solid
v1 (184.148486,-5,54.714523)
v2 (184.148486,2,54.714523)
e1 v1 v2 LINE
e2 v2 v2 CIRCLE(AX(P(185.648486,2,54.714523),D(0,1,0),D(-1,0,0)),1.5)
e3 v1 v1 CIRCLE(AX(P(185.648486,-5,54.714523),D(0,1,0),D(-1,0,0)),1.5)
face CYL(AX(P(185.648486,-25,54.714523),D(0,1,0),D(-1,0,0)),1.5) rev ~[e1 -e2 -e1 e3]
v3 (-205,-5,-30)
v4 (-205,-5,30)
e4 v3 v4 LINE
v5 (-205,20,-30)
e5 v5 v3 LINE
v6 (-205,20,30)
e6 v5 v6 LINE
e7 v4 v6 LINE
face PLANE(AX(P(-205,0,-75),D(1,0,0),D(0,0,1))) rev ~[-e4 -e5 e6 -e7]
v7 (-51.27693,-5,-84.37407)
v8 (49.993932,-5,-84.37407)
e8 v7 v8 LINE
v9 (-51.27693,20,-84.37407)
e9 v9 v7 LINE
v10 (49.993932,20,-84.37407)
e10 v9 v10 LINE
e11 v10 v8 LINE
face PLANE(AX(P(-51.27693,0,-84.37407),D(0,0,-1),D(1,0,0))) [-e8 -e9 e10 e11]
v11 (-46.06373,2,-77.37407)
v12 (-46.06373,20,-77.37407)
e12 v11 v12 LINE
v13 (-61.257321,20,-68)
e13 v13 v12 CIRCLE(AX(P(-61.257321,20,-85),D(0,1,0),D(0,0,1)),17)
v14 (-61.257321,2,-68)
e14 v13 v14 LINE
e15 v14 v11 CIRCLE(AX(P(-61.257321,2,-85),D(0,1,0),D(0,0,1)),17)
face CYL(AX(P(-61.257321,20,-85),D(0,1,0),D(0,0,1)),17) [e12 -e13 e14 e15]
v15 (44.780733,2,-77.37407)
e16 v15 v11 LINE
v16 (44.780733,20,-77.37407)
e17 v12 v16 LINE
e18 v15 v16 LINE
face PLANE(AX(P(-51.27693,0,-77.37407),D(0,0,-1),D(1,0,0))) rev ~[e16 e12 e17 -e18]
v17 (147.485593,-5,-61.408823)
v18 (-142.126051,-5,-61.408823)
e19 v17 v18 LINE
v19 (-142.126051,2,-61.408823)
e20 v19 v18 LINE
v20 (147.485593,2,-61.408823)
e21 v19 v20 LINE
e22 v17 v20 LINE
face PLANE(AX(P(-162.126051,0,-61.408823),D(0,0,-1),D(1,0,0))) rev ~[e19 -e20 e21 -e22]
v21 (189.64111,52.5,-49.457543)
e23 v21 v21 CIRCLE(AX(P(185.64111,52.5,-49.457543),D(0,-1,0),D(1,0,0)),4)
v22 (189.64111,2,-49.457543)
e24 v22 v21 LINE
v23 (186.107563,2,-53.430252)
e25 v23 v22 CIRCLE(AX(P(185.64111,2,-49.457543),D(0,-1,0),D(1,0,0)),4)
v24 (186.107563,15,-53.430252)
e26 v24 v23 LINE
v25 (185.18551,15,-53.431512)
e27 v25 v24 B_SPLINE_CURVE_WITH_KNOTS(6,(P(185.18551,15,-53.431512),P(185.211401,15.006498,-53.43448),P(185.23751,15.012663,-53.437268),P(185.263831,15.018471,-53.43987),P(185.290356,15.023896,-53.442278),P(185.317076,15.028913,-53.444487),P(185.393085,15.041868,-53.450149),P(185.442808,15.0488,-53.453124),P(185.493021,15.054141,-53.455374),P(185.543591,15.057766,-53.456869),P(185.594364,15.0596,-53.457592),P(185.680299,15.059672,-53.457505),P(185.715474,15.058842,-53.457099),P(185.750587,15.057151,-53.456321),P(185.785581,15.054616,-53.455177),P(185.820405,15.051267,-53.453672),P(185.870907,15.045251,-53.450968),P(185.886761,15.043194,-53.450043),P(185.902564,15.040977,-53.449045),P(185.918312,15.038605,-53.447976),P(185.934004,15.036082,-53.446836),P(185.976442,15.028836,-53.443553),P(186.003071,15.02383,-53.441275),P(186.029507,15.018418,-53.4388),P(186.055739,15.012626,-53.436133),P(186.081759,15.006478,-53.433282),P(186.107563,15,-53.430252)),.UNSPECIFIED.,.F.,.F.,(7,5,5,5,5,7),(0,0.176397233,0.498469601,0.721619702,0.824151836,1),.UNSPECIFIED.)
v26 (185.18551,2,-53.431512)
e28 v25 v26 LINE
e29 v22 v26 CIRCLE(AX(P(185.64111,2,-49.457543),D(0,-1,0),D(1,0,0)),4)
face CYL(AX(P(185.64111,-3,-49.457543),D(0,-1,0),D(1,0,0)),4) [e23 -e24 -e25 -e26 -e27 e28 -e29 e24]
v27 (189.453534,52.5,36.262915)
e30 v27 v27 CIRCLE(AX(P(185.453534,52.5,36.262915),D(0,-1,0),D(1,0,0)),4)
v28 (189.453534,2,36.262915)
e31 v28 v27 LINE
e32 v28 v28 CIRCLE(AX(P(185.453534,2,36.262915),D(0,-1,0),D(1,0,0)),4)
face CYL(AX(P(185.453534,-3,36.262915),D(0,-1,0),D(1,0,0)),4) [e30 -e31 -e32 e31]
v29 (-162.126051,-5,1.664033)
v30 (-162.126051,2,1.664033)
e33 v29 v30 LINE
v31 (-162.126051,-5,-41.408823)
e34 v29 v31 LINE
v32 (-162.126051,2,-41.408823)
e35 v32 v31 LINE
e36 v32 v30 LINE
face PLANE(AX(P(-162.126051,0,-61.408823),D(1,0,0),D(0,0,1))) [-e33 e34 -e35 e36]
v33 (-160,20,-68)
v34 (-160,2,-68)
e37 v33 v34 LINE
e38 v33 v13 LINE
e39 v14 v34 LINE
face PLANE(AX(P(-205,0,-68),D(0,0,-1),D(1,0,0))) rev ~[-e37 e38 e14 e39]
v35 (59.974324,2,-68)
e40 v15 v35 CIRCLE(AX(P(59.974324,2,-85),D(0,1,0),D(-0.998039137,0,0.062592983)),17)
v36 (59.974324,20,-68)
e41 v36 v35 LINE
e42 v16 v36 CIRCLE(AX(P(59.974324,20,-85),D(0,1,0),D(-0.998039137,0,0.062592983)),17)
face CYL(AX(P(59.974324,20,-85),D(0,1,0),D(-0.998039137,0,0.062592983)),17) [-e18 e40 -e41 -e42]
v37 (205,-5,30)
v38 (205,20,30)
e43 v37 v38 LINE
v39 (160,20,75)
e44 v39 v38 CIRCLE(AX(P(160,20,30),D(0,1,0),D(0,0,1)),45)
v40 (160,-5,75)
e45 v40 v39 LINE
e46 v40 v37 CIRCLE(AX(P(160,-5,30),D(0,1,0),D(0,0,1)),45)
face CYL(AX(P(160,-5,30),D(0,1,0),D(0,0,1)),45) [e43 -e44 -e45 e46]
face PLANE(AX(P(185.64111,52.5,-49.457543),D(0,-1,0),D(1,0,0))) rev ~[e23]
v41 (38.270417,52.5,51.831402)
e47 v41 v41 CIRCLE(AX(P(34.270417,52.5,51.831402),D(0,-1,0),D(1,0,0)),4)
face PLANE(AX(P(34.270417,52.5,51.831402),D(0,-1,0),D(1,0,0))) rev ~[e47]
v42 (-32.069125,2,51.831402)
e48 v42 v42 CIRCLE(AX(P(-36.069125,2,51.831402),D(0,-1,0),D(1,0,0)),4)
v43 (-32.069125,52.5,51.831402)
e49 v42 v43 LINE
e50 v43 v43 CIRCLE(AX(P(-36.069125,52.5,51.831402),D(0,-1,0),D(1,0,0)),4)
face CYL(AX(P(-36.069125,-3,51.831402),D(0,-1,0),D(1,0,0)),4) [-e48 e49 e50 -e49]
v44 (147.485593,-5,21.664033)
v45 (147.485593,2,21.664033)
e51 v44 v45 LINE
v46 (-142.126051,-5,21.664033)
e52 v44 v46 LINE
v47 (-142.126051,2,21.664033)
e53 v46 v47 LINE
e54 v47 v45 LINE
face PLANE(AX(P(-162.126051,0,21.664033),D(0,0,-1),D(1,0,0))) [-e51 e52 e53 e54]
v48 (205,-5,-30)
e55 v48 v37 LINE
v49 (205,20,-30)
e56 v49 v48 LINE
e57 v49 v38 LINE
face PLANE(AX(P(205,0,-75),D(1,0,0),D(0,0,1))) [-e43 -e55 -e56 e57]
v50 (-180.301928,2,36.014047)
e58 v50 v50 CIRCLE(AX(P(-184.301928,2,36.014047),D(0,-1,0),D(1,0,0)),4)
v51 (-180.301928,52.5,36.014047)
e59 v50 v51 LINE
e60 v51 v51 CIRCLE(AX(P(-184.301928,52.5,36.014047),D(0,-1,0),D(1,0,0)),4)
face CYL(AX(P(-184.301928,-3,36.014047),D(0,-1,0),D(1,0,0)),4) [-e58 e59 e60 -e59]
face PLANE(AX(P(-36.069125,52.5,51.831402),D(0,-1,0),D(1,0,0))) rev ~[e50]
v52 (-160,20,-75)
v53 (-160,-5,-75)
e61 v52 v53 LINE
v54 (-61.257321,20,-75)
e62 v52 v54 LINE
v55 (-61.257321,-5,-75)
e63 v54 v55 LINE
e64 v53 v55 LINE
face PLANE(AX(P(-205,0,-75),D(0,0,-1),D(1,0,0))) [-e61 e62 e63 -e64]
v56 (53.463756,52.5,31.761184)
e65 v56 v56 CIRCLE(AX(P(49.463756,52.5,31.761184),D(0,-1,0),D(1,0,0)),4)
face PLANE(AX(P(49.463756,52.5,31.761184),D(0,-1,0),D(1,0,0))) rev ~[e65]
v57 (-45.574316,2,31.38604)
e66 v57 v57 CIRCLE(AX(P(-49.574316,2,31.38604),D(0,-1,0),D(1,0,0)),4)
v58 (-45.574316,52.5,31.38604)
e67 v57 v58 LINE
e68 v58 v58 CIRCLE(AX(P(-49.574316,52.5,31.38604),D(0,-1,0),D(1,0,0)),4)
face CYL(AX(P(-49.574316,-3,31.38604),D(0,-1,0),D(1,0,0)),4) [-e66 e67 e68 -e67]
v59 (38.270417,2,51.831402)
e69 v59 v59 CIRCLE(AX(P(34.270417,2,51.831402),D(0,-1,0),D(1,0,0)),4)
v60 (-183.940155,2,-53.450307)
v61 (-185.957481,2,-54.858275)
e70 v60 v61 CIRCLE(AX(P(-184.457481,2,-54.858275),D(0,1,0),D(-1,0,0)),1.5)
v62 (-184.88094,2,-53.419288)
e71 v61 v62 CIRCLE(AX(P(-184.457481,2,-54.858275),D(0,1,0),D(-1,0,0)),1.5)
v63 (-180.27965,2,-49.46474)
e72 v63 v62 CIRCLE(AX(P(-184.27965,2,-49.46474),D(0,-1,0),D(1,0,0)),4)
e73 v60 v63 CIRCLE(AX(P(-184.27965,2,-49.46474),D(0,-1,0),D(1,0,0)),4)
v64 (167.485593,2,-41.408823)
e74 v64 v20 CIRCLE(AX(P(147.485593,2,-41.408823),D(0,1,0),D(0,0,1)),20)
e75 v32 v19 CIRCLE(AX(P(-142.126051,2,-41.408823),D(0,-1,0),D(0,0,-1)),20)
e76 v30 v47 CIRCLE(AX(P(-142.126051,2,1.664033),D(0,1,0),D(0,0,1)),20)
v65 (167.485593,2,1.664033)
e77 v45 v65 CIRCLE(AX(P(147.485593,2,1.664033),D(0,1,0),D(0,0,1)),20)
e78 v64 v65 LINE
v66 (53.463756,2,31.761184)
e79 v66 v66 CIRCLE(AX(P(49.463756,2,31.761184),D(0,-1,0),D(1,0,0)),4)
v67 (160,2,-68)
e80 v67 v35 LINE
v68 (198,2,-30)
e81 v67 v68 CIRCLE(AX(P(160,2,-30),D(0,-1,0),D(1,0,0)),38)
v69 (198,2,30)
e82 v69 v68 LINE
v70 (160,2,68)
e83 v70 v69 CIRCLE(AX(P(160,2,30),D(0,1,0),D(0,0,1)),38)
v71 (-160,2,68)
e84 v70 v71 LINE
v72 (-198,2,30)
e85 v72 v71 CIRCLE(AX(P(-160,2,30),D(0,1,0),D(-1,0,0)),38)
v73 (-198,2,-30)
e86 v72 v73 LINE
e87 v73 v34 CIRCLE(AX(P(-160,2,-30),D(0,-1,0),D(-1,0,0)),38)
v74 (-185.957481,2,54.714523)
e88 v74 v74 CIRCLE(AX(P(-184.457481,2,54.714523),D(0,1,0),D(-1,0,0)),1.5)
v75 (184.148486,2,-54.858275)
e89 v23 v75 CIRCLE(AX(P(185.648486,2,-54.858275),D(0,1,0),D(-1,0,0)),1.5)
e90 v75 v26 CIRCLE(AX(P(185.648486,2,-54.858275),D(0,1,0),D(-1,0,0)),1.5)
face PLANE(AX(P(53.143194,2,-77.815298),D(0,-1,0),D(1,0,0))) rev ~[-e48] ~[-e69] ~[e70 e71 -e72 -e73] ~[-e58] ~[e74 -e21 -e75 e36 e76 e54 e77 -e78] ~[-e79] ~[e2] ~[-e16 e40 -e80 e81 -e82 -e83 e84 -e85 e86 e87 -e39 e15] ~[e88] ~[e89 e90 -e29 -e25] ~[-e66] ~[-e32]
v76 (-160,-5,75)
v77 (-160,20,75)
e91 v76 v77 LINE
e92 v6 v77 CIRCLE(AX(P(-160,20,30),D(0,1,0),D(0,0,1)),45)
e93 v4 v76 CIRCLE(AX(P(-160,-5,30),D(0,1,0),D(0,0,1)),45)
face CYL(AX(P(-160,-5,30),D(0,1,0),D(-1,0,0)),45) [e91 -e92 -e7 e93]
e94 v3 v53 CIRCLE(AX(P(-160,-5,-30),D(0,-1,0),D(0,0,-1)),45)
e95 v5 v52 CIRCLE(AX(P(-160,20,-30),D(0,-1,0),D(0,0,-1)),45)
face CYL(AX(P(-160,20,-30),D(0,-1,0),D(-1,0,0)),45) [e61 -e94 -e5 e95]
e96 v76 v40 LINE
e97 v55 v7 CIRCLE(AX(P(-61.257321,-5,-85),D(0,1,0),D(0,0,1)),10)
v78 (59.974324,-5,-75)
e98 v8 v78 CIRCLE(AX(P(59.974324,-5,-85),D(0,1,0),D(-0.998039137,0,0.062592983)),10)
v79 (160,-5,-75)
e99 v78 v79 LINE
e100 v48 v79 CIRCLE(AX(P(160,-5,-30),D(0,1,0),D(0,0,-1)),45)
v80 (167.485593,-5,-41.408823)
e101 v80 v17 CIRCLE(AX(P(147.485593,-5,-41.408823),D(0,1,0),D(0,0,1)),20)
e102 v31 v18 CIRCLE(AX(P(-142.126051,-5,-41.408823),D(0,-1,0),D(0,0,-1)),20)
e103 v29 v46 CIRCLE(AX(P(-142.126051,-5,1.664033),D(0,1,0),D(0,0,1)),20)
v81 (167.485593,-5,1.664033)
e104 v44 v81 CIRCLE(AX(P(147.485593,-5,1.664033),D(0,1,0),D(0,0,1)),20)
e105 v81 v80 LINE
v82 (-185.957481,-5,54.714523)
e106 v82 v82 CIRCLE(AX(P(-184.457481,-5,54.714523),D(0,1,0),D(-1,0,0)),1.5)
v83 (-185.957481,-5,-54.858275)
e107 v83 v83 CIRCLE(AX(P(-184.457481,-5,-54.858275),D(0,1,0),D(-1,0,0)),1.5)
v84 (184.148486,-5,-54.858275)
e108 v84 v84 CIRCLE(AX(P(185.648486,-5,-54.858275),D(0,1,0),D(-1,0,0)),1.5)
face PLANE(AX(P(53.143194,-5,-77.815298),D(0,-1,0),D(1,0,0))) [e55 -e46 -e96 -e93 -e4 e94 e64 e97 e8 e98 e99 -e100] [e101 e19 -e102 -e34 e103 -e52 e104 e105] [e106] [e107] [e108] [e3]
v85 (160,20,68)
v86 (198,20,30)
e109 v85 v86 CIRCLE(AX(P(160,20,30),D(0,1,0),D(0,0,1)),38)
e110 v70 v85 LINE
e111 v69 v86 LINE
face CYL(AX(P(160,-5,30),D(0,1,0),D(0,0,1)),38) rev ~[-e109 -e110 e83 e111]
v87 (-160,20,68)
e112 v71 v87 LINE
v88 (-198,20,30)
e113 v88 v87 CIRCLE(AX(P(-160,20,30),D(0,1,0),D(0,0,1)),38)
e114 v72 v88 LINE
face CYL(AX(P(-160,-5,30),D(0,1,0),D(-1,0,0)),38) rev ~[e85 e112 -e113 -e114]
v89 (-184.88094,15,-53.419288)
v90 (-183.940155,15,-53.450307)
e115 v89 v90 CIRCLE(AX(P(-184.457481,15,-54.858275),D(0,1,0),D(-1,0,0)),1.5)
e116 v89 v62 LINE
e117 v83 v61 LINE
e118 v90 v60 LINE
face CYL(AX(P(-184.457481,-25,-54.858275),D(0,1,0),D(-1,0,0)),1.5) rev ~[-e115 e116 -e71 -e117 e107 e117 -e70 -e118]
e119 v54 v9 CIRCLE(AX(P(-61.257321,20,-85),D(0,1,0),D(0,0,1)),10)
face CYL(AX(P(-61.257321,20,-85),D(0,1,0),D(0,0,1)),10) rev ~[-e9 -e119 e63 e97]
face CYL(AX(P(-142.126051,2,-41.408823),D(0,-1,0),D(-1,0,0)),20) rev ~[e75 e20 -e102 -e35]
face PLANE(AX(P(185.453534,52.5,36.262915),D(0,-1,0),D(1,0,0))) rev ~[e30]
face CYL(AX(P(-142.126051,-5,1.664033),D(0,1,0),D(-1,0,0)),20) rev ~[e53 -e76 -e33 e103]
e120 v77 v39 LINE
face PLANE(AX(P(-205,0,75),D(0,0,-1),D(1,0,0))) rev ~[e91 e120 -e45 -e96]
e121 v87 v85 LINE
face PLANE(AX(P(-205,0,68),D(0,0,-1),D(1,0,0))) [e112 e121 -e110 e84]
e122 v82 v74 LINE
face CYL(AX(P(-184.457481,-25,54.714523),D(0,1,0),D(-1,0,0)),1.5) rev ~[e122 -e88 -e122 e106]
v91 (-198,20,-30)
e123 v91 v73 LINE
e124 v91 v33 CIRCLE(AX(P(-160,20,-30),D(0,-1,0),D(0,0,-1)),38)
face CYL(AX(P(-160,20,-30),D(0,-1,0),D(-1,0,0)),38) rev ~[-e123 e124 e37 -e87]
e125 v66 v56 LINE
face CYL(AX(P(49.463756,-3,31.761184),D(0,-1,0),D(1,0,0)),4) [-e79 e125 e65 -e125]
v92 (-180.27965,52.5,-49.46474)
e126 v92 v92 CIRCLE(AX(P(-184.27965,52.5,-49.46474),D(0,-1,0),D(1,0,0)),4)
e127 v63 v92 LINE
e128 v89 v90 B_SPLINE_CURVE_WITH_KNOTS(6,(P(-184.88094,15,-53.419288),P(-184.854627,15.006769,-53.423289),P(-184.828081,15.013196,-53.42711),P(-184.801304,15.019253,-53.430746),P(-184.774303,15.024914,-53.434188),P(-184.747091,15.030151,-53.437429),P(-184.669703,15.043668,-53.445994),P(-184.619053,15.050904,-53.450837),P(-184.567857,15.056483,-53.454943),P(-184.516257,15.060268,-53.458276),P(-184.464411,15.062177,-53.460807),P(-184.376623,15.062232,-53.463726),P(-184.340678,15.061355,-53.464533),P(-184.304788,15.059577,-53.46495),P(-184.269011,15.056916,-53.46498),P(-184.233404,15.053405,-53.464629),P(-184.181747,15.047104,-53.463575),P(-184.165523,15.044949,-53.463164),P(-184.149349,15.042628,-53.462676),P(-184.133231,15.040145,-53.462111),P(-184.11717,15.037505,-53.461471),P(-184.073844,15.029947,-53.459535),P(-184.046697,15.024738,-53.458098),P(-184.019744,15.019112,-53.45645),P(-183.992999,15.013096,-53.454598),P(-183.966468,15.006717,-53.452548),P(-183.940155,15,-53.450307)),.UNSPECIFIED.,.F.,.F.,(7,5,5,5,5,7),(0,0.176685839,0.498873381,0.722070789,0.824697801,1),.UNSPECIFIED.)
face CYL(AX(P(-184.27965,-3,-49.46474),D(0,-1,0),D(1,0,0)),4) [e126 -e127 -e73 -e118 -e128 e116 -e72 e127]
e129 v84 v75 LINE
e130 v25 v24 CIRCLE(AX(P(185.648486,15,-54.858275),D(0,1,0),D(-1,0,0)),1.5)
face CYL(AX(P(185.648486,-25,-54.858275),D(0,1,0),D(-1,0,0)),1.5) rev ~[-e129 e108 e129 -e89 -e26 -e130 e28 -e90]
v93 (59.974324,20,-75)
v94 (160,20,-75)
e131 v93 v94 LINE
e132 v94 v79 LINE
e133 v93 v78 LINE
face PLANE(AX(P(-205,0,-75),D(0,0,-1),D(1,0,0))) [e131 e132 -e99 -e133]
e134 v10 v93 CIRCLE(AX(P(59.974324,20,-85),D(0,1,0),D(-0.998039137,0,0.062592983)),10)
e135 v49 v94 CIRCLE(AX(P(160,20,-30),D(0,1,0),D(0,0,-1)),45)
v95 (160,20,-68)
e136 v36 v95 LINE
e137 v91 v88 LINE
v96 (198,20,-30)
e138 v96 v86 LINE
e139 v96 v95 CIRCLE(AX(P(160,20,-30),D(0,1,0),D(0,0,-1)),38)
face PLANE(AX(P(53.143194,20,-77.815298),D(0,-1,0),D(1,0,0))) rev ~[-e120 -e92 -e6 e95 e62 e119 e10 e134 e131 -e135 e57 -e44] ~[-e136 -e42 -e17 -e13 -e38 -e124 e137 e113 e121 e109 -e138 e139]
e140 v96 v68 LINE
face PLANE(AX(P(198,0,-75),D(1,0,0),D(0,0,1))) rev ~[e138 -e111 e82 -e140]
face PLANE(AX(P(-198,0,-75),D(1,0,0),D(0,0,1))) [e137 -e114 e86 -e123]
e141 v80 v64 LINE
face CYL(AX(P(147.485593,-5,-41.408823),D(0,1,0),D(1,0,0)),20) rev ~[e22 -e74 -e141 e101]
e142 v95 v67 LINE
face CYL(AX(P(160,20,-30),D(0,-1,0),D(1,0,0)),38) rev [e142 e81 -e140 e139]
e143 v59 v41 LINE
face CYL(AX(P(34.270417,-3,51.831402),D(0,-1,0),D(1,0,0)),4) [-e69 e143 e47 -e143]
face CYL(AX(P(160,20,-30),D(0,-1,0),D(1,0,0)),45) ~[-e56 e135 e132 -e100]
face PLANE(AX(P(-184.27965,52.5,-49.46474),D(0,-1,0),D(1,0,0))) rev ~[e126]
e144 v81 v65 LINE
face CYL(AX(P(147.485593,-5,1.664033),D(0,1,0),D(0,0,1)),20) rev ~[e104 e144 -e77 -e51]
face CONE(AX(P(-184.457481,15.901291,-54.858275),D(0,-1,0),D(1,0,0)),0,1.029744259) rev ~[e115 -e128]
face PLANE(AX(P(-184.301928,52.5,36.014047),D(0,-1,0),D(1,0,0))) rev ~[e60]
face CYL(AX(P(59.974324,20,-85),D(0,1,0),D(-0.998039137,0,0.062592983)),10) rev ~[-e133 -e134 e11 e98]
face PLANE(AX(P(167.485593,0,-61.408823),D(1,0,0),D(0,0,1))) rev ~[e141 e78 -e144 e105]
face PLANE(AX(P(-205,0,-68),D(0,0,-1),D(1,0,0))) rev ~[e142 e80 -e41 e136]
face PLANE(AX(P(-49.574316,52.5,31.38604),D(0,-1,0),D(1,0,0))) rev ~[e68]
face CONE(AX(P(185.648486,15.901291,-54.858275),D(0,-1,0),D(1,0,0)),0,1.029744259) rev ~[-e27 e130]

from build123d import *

# Parameters (mm, degrees)
F0_W           = 410
F0_H           = 150
F1_DEPTH       = 5
F1_DEPTH_BACK  = 20
F2_R           = 45
F3_R           = 45
F4_R           = 45
F5_W           = 101.2708619237
F5_H           = 20.8901241422
F6_DEPTH       = 5
F6_DEPTH_BACK  = 20
F7_T1_DEPTH    = 25
F8_T1_DEPTH    = 25
F10_T          = -7
F12_R          = 4
F13_DEPTH      = 55.5
F14_W          = 329.6116441488
F14_H          = 83.0728560686
F15_DEPTH      = 25
F15_DEPTH_BACK = 25
F16_R          = 20
F20_D          = 3
F20_DEPTH      = 20
F20_TIP        = 0.9012909285


# Not quite as in the source:
# - a fillet or chamfer that OpenCascade refuses, or shapes differently, is made with other operations: its cross-section is extruded or revolved along the edge and cut away or added


with BuildPart() as f1:
    # F0 (on Front) → F1 (new body, two sides)
    with BuildSketch(Plane.XZ) as f1_sk:
        Rectangle(F0_W, F0_H)
    extrude(amount=F1_DEPTH)
    extrude(f1_sk.sketch, amount=-F1_DEPTH_BACK)

    # F2
    f2_edges = [f1.edges().sort_by_distance(p)[0] for p in [
        (-205, 7.5, 75),
        (-205, 7.5, -75),
    ]]
    fillet(f2_edges, radius=F2_R)

    # F3
    f3_edges = [f1.edges().sort_by_distance(p)[0] for p in [
        (205, 7.5, 75),
    ]]
    fillet(f3_edges, radius=F3_R)

    # F4
    f4_edges = [f1.edges().sort_by_distance(p)[0] for p in [
        (205, 7.5, -75),
    ]]
    fillet(f4_edges, radius=F4_R)

    # F5 (on Front) → F6 (join, two sides)
    with BuildSketch(Plane.XZ) as f6_sk:
        with Locations((-0.6414987147, -73.9290080965)):
            Rectangle(F5_W, F5_H)
    extrude(amount=F6_DEPTH)
    extrude(f6_sk.sketch, amount=-F6_DEPTH_BACK)

    # F7: fillet of radius 10 on 1 edges, made by hand

    # F7_s2 → F7_t1 (join)
    with BuildSketch(Plane.XZ.offset(-20)):
        with BuildLine():
            ThreePointArc((-61.2573210439, -75), (-54.4111286103, -77.7109912085), (-51.2769296765, -84.3740701675))
            Line((-51.2769296765, -84.3740701675), (-51.2769296765, -75))
            Line((-51.2769296765, -75), (-61.2573210439, -75))
        make_face()
    extrude(amount=F7_T1_DEPTH)

    # F8: fillet of radius 10 on 1 edges, made by hand

    # F8_s2 → F8_t1 (join)
    with BuildSketch(Plane.XZ.offset(-20)):
        with BuildLine():
            ThreePointArc((49.9939322472, -84.3740701675), (53.1281311809, -77.7109912085), (59.9743236145, -75))
            Line((59.9743236145, -75), (49.9939322472, -75))
            Line((49.9939322472, -75), (49.9939322472, -84.3740701675))
        make_face()
    extrude(amount=F8_T1_DEPTH)

    # F10
    f10_openings = [f1.faces().sort_by_distance(p)[0] for p in [
        (-0.010473, 20, -1.299239),
    ]]
    offset(amount=F10_T, openings=f10_openings)

    # F12 (on offset) → F13 (join)
    with BuildSketch(Plane.XZ.offset(3)):
        with Locations((-184.3019276857, 36.01404652)):
            Circle(F12_R)
        with Locations((-184.2796504498, -49.4647398591)):
            Circle(F12_R)
        with Locations((-36.0691249371, 51.8314018846)):
            Circle(F12_R)
        with Locations((-49.5743155479, 31.3860401511)):
            Circle(F12_R)
        with Locations((34.2704169452, 51.8314018846)):
            Circle(F12_R)
        with Locations((49.4637563825, 31.7611843348)):
            Circle(F12_R)
        with Locations((185.4535341263, 36.2629145384)):
            Circle(F12_R)
        with Locations((185.6411099434, -49.4575425982)):
            Circle(F12_R)
    extrude(amount=-F13_DEPTH)

    # F14 (on face) → F15 (cut, two sides)
    with BuildSketch(Plane.XZ) as f15_sk:
        with Locations((2.6797705796, -19.8723953217)):
            Rectangle(F14_W, F14_H)
    extrude(amount=F15_DEPTH, mode=Mode.SUBTRACT)
    extrude(f15_sk.sketch, amount=-F15_DEPTH_BACK, mode=Mode.SUBTRACT)

    # F16
    f16_edges = [f1.edges().sort_by_distance(p)[0] for p in [
        (-162.126051, -1.5, 21.664033),
        (167.485593, -1.5, 21.664033),
        (167.485593, -1.5, -61.408823),
        (-162.126051, -1.5, -61.408823),
    ]]
    fillet(f16_edges, radius=F16_R)

    # F20
    with Locations(Plane.XZ.offset(5)):
        with Locations((-184.4574809074, 54.7145232558), (-184.4574809074, -54.8582747579), (185.6484860182, -54.8582747579), (185.6484860182, 54.7145232558)):
            Hole(F20_D / 2, depth=F20_DEPTH)
            with Locations((0, 0, -(F20_DEPTH + F20_TIP / 2))):  # 118° drill point
                Cone(0, F20_D / 2, F20_TIP, mode=Mode.SUBTRACT)


solid = f1.part
